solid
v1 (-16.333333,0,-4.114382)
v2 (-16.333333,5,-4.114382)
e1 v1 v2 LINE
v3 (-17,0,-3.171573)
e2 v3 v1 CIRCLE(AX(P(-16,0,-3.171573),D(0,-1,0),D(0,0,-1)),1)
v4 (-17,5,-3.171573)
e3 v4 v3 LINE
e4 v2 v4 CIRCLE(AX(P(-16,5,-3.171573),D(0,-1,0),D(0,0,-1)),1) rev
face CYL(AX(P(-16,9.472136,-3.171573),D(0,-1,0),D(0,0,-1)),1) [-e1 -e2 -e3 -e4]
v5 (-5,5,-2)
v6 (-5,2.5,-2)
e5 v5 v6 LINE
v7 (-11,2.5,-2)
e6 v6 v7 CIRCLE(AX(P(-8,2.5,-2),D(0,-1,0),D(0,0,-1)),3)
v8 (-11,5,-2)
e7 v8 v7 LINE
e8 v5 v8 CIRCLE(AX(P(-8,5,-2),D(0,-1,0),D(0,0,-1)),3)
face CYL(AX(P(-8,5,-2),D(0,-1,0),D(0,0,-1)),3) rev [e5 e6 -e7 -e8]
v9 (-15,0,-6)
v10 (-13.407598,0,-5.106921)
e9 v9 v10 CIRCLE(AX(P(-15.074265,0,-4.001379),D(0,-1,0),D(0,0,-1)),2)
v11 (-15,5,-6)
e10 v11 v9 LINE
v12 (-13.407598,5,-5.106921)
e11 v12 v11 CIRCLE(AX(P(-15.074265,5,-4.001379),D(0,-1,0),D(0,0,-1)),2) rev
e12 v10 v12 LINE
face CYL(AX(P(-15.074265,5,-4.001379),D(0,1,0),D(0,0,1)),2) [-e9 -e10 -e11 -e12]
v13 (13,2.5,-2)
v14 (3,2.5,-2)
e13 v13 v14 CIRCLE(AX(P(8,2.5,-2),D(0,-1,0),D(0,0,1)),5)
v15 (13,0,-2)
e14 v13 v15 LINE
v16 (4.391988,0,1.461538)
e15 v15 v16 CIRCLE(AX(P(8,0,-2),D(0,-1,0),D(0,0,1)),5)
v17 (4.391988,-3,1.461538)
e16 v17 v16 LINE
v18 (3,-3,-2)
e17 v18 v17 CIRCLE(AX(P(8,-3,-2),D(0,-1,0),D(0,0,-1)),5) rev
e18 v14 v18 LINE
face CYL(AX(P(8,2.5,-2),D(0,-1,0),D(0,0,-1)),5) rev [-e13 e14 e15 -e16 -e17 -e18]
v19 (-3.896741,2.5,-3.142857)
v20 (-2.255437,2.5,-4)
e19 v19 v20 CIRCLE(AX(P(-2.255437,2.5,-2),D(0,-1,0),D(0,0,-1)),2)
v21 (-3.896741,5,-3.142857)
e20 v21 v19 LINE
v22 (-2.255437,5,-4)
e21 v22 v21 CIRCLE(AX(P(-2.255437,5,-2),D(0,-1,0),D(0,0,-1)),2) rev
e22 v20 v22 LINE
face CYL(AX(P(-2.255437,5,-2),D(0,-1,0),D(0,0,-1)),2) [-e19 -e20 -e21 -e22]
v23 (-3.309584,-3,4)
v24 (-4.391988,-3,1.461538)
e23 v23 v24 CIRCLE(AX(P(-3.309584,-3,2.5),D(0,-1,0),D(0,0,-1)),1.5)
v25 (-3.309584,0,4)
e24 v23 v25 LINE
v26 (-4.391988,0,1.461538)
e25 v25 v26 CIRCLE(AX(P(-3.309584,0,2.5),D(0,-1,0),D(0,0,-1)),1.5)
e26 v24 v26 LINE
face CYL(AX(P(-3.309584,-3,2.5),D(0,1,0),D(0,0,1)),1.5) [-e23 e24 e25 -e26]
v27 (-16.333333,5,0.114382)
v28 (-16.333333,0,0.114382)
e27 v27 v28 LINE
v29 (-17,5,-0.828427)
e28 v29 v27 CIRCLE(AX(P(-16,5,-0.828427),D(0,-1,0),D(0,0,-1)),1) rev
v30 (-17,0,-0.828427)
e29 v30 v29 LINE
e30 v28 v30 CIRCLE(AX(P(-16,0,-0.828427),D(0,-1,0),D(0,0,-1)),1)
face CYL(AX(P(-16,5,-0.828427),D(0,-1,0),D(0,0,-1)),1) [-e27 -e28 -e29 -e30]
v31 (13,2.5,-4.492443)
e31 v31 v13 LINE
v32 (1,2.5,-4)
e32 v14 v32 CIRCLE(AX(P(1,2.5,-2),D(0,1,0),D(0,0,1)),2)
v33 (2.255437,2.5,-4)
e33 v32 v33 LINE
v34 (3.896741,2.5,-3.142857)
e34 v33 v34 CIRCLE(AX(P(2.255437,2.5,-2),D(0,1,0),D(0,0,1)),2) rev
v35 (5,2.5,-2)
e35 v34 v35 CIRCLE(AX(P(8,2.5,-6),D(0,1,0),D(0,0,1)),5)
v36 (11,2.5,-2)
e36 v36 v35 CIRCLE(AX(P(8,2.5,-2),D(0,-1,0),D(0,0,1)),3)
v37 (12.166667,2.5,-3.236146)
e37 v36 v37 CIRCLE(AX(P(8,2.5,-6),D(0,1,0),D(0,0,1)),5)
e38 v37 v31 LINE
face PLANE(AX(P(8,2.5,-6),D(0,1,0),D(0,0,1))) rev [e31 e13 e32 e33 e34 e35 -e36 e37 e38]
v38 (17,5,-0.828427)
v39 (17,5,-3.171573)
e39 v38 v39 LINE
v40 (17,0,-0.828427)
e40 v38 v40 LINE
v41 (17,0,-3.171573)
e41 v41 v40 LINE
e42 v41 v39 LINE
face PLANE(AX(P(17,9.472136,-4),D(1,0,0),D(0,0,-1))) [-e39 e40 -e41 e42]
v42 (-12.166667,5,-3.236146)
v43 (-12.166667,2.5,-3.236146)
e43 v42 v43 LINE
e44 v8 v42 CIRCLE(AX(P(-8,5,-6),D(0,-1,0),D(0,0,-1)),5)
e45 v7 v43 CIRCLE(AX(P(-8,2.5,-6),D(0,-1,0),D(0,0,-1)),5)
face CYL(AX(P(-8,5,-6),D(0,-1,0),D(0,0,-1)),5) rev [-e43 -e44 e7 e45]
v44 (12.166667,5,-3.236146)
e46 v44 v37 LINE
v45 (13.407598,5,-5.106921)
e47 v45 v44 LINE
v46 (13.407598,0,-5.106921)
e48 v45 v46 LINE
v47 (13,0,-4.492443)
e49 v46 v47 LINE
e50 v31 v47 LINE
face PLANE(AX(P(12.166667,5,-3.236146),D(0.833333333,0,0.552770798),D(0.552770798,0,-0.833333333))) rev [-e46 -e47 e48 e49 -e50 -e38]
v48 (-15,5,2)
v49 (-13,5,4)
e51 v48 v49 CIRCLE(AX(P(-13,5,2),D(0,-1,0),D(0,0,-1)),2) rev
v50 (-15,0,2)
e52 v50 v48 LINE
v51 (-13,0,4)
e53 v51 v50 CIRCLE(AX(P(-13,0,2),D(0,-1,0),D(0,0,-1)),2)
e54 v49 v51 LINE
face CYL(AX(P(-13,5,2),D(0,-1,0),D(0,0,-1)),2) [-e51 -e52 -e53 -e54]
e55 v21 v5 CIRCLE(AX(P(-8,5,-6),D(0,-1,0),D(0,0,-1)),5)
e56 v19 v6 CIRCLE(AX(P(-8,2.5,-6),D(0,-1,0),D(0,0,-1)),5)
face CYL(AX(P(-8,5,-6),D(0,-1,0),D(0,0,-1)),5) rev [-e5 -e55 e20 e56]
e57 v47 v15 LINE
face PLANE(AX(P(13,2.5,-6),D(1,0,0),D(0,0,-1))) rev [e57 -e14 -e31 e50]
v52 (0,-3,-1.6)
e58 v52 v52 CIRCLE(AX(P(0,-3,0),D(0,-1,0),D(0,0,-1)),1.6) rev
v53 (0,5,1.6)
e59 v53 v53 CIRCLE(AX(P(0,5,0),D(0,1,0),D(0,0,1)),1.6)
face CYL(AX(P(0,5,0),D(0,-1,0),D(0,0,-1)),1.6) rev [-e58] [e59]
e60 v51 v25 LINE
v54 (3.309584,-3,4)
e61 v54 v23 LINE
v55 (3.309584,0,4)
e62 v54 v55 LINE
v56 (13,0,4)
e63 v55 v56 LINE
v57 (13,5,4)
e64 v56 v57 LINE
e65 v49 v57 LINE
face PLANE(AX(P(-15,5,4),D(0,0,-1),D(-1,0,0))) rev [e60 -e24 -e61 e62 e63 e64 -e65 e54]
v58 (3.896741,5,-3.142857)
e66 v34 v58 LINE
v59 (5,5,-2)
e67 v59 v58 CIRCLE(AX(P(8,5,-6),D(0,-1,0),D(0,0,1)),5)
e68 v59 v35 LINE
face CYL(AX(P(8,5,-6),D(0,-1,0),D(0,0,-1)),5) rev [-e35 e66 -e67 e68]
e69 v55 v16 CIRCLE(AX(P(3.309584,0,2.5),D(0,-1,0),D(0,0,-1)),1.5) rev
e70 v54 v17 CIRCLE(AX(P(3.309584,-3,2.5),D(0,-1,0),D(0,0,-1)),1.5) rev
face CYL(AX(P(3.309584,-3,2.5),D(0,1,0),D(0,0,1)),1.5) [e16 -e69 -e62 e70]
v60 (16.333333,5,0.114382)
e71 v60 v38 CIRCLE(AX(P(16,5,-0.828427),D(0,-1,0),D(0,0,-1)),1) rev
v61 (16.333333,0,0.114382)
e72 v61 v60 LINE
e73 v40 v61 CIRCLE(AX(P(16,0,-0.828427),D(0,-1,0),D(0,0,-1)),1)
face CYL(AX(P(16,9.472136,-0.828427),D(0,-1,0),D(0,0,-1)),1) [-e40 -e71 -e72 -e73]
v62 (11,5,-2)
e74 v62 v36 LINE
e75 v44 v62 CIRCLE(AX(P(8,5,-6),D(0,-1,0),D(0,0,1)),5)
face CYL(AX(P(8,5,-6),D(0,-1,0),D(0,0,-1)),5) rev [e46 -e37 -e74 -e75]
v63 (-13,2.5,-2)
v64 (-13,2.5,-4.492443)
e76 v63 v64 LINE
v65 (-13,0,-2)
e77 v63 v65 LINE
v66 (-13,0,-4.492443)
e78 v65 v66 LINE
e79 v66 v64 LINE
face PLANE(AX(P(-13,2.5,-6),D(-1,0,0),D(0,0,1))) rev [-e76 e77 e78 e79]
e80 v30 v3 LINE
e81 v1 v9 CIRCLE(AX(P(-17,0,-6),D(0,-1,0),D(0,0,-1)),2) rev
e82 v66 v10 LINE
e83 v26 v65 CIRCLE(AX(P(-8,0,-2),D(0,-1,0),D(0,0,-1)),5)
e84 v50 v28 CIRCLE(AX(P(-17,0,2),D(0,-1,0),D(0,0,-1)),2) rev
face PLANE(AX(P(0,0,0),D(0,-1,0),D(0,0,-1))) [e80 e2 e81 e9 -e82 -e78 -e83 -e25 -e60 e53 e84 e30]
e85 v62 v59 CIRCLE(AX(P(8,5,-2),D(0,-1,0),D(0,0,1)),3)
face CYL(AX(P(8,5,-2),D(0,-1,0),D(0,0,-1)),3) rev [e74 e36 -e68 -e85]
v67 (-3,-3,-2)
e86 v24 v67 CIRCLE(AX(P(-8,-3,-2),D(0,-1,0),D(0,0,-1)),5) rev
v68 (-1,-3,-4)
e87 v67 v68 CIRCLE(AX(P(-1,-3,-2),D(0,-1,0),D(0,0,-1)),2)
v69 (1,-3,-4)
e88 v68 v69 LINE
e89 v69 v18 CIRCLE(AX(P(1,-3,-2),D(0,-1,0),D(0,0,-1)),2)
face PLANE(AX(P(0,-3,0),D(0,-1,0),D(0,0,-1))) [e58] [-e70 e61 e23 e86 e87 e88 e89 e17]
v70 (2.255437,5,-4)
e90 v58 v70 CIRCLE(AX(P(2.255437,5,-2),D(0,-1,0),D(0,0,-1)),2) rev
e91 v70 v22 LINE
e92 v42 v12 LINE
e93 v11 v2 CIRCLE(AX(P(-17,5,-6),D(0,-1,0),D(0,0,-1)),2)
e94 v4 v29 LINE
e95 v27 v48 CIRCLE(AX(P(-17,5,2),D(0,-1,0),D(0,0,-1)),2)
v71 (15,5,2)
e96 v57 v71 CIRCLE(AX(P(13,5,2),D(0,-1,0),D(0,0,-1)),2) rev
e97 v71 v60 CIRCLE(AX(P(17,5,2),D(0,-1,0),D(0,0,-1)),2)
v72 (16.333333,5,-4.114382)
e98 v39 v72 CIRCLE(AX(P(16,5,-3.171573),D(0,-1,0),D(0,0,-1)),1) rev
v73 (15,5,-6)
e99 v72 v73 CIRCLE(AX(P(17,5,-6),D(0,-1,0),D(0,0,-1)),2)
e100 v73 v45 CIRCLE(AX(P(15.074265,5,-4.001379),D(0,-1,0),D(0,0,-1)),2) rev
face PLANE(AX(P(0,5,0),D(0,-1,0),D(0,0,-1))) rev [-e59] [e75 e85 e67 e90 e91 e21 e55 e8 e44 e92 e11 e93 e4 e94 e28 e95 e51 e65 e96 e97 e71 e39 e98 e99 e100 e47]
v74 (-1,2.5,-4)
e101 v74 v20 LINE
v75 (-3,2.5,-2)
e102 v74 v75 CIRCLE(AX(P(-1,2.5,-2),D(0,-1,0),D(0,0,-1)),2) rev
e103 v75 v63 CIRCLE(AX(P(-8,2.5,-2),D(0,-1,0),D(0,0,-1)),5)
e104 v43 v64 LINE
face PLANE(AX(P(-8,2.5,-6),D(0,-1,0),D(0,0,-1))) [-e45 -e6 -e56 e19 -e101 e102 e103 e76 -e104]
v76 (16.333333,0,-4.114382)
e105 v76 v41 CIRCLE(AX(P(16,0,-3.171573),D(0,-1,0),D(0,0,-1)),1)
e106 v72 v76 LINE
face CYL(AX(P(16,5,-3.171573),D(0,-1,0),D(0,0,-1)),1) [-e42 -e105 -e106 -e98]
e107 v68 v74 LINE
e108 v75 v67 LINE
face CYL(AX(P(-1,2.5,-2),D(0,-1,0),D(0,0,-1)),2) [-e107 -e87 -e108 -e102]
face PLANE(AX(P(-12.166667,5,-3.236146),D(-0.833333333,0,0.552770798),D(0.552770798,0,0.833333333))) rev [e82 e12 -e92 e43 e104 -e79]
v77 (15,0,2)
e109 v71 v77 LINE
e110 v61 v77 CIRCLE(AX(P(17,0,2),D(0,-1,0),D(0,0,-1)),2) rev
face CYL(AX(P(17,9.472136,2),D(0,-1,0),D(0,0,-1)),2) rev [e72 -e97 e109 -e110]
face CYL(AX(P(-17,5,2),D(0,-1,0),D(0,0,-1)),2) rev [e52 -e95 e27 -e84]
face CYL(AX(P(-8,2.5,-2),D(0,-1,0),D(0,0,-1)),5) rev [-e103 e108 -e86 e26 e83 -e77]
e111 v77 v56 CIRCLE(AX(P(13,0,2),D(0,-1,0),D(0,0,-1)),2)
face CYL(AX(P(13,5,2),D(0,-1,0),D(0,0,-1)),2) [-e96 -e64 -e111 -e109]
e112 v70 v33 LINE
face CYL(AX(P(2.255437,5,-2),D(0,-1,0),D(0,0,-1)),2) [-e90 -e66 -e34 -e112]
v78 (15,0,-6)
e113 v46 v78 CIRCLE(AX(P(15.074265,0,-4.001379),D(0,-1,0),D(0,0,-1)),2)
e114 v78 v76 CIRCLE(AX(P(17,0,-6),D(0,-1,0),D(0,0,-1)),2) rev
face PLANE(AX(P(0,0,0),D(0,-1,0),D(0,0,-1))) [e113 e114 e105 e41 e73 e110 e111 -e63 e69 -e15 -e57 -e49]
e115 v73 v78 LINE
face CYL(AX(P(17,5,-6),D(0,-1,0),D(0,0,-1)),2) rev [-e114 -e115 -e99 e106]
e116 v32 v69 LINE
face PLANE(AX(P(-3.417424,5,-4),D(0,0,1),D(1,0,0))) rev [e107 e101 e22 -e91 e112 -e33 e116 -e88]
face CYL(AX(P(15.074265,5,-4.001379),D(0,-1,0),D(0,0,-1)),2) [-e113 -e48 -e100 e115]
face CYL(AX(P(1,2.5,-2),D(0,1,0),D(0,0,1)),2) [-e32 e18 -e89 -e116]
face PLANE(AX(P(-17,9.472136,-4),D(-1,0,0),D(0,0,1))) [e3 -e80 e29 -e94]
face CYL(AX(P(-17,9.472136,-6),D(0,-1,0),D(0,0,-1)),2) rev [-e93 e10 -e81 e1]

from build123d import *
from build123d.topology import SkipClean

# Parameters (mm, degrees)
SKETCH_1_R          = 1.6
EXTRUDE_1_DEPTH     = 5
CUT_EXTRUDE_1_DEPTH = 2.5
CUT_EXTRUDE_3_DEPTH = 17.347782724
CUT_EXTRUDE_4_DEPTH = 17.911534525
SKETCH_8_W          = 6.83484861
SKETCH_8_H          = 2
CUT_EXTRUDE_5_DEPTH = 17.911534525
EXTRUDE_START       = 3
SKETCH_14_R         = 1.6
EXTRUDE_7_DEPTH     = 3
FILLET_2_R          = 2
SKETCH_15_W         = 2
SKETCH_15_H         = 4
EXTRUDE_8_DEPTH     = 5
FILLET_3_R          = 2
FILLET_4_R          = 1


# Some blends are built 0.0001 mm under size
with BuildPart() as part:
    # 草图1 → 凸台-拉伸1 (new body)
    with BuildSketch(Plane(origin=(0, 0, 0), x_dir=(1, 0, 0), z_dir=(0, 1, 0))):
        Polygon((-15, -4), (15, -4), (15, 4), (15, 6), (-15, 6), (-15, 4), align=None)
        with Locations(Location((0, 0, 0), (0, 0, 270))):
            Circle(SKETCH_1_R, mode=Mode.SUBTRACT)
    extrude(amount=EXTRUDE_1_DEPTH)

    # 草图4 → 切除-拉伸1 (cut)
    with BuildSketch(Plane.XZ):
        with BuildLine():
            Line((-13, -6), (-13, -2))
            ThreePointArc((-13, -2), (-8, 3), (-3, -2))
            Line((-3, -2), (-3, -6))
            ThreePointArc((-3, -6), (-8, -11), (-13, -6))
        make_face()
        with BuildLine():
            Line((13, -6), (13, -2))
            ThreePointArc((13, -2), (8, 3), (3, -2))
            Line((3, -2), (3, -6))
            ThreePointArc((3, -6), (8, -11), (13, -6))
        make_face()
    extrude(amount=-CUT_EXTRUDE_1_DEPTH, mode=Mode.SUBTRACT)

    # 草图6 → 切除-拉伸3 (cut, through all)
    with BuildSketch(Plane.XZ.offset(-2.5)):
        with BuildLine():
            Line((-11, -6), (-11, -2))
            ThreePointArc((-11, -2), (-8, 1), (-5, -2))
            Line((-5, -2), (-5, -6))
            ThreePointArc((-5, -6), (-8, -9), (-11, -6))
        make_face()
        with BuildLine():
            Line((11, -6), (11, -2))
            ThreePointArc((11, -2), (8, 1), (5, -2))
            Line((5, -2), (5, -6))
            ThreePointArc((5, -6), (8, -9), (11, -6))
        make_face()
    extrude(amount=-CUT_EXTRUDE_3_DEPTH, mode=Mode.SUBTRACT)

    # 草图7 → 切除-拉伸4 (cut, through all)
    with BuildSketch(Plane.XZ):
        with BuildLine():
            Line((-12.166666667, -3.236146008), (-14, -6))
            Line((-14, -6), (-13, -6))
            ThreePointArc((-13, -6), (-3.212864461, -7.443375673), (-12.166666667, -3.236146008))
        make_face()
        with BuildLine():
            Line((14, -6), (13, -6))
            ThreePointArc((13, -6), (3.212864461, -7.443375673), (12.166666667, -3.236146008))
            Line((12.166666667, -3.236146008), (14, -6))
        make_face()
    extrude(amount=-CUT_EXTRUDE_4_DEPTH, mode=Mode.SUBTRACT)

    # 草图8 → 切除-拉伸5 (cut, through all)
    with BuildSketch(Plane.XZ):
        with Locations((0, -5)):
            Rectangle(SKETCH_8_W, SKETCH_8_H)
    extrude(amount=-CUT_EXTRUDE_5_DEPTH, mode=Mode.SUBTRACT)

    # 草图14 → 凸台-拉伸7 (add)
    with SkipClean():  # the faces are left unmerged after this step: merging them gives an invalid solid
        with BuildSketch(Plane.XZ.offset(EXTRUDE_START)):
            with BuildLine():
                Line((-3, -2), (-3, -4))
                Line((-3, -4), (3, -4))
                Line((3, -4), (3, -2))
                ThreePointArc((3, -2), (3.361031331, -0.134532313), (4.391987877, 1.461538462))
                ThreePointArc((4.391987877, 1.461538462), (4.689383557, 3.088348405), (3.30958424, 4))
                Line((3.30958424, 4), (-3.30958424, 4))
                ThreePointArc((-3.30958424, 4), (-4.689383557, 3.088348405), (-4.391987877, 1.461538462))
                ThreePointArc((-4.391987877, 1.461538462), (-3.361031331, -0.134532313), (-3, -2))
            make_face()
            Circle(SKETCH_14_R, mode=Mode.SUBTRACT)
        extrude(amount=-EXTRUDE_7_DEPTH)

    # 圆角2
    # the kernel refuses this fillet: 2 mm, written as the material it takes off along each edge
    with BuildSketch(Plane(origin=(-3, -8, -4), x_dir=(0, 0, 1), z_dir=(0, 1, 0)), Plane(origin=(3, -8, -4), x_dir=(-1, 0, 0), z_dir=(0, 1, 0))) as fillet_2_piece_1:
        with BuildLine():
            CenterArc((FILLET_2_R, FILLET_2_R), FILLET_2_R, 180, 90)
            Line((0, FILLET_2_R), (0, 0))
            Line((0, 0), (FILLET_2_R, 0))
        make_face()
    extrude(amount=8, mode=Mode.SUBTRACT)
    with BuildSketch(Plane(origin=(-15, -5, 4), x_dir=(1, 0, 0), z_dir=(0, 1, 0))) as fillet_2_piece_2:
        with BuildLine():
            CenterArc((FILLET_2_R, FILLET_2_R), FILLET_2_R, 180, 90)
            Line((0, FILLET_2_R), (0, 0))
            Line((0, 0), (FILLET_2_R, 0))
        make_face()
    extrude(amount=15, mode=Mode.SUBTRACT)
    with BuildSketch(Plane(origin=(15, -5, 4), x_dir=(-1, 0, 0), z_dir=(0, 1, 0))) as fillet_2_piece_3:
        with BuildLine():
            CenterArc((FILLET_2_R, -FILLET_2_R), FILLET_2_R, 90, 90)
            Line((0, -FILLET_2_R), (0, 0))
            Line((0, 0), (FILLET_2_R, 0))
        make_face()
    extrude(amount=15, mode=Mode.SUBTRACT)
    with BuildSketch(Plane(origin=(14, -2.679237314, -6), x_dir=(1, 0, 0), z_dir=(0, 1, 0))) as fillet_2_piece_4:
        with BuildLine():
            CenterArc((1.074265007, -1.998620702), FILLET_2_R, 92.128024951, 54.314665287)
            Line((-0.59240166, -0.893079105), (0, 0))
            Line((0, 0), (1, 0))
        make_face()
    extrude(amount=10.358474629, mode=Mode.SUBTRACT)
    with BuildSketch(Plane(origin=(-14, -2.679237314, -6), x_dir=(-1, 0, 0), z_dir=(0, 1, 0))) as fillet_2_piece_5:
        with BuildLine():
            CenterArc((1.074265007, 1.998620702), FILLET_2_R, 213.557309762, 54.314665287)
            Line((-0.59240166, 0.893079105), (0, 0))
            Line((0, 0), (1, 0))
        make_face()
    extrude(amount=10.358474629, mode=Mode.SUBTRACT)
    with BuildSketch(Plane(origin=(3, 2.5, -4), x_dir=(-1, 0, 0), z_dir=(0, -1, 0))) as fillet_2_piece_6:
        with BuildLine():
            CenterArc((FILLET_2_R, -FILLET_2_R), FILLET_2_R, 90, 90)
            Line((0, -FILLET_2_R), (0, 0))
            Line((0, 0), (FILLET_2_R, 0))
        make_face()
    extrude(amount=2.5, mode=Mode.SUBTRACT)
    with BuildSketch(Plane(origin=(-3, 2.5, -4), x_dir=(1, 0, 0), z_dir=(0, -1, 0))) as fillet_2_piece_7:
        with BuildLine():
            CenterArc((FILLET_2_R, FILLET_2_R), FILLET_2_R, 180, 90)
            Line((0, FILLET_2_R), (0, 0))
            Line((0, 0), (FILLET_2_R, 0))
        make_face()
    extrude(amount=2.5, mode=Mode.SUBTRACT)

    # 草图15 → 凸台-拉伸8 (add)
    with BuildSketch(Plane.XZ):
        with Locations((16, -2)):
            Rectangle(SKETCH_15_W, SKETCH_15_H)
        with Locations((-16, -2)):
            Rectangle(SKETCH_15_W, SKETCH_15_H)
    extrude(amount=-EXTRUDE_8_DEPTH)

    # 圆角3
    fillet_3_edges = [part.edges().sort_by_distance(p)[0] for p in [
        (3.417424305, 3.75, -4),
        (-3.417424305, 3.75, -4),
        (-15, 2.5, 0),
        (15, 2.5, 0),
        (-15, 2.5, -4),
        (15, 2.5, -4),
    ]]
    fillet(fillet_3_edges, radius=FILLET_3_R - 0.0001)  # a hair under: the kernel refuses the full size

    # 圆角4
    fillet_4_edges = [part.edges().sort_by_distance(p)[0] for p in [
        (17, 2.5, 0),
        (17, 2.5, -4),
        (-17, 2.5, -4),
        (-17, 2.5, 0),
    ]]
    fillet(fillet_4_edges, radius=FILLET_4_R)


solid = part.part
